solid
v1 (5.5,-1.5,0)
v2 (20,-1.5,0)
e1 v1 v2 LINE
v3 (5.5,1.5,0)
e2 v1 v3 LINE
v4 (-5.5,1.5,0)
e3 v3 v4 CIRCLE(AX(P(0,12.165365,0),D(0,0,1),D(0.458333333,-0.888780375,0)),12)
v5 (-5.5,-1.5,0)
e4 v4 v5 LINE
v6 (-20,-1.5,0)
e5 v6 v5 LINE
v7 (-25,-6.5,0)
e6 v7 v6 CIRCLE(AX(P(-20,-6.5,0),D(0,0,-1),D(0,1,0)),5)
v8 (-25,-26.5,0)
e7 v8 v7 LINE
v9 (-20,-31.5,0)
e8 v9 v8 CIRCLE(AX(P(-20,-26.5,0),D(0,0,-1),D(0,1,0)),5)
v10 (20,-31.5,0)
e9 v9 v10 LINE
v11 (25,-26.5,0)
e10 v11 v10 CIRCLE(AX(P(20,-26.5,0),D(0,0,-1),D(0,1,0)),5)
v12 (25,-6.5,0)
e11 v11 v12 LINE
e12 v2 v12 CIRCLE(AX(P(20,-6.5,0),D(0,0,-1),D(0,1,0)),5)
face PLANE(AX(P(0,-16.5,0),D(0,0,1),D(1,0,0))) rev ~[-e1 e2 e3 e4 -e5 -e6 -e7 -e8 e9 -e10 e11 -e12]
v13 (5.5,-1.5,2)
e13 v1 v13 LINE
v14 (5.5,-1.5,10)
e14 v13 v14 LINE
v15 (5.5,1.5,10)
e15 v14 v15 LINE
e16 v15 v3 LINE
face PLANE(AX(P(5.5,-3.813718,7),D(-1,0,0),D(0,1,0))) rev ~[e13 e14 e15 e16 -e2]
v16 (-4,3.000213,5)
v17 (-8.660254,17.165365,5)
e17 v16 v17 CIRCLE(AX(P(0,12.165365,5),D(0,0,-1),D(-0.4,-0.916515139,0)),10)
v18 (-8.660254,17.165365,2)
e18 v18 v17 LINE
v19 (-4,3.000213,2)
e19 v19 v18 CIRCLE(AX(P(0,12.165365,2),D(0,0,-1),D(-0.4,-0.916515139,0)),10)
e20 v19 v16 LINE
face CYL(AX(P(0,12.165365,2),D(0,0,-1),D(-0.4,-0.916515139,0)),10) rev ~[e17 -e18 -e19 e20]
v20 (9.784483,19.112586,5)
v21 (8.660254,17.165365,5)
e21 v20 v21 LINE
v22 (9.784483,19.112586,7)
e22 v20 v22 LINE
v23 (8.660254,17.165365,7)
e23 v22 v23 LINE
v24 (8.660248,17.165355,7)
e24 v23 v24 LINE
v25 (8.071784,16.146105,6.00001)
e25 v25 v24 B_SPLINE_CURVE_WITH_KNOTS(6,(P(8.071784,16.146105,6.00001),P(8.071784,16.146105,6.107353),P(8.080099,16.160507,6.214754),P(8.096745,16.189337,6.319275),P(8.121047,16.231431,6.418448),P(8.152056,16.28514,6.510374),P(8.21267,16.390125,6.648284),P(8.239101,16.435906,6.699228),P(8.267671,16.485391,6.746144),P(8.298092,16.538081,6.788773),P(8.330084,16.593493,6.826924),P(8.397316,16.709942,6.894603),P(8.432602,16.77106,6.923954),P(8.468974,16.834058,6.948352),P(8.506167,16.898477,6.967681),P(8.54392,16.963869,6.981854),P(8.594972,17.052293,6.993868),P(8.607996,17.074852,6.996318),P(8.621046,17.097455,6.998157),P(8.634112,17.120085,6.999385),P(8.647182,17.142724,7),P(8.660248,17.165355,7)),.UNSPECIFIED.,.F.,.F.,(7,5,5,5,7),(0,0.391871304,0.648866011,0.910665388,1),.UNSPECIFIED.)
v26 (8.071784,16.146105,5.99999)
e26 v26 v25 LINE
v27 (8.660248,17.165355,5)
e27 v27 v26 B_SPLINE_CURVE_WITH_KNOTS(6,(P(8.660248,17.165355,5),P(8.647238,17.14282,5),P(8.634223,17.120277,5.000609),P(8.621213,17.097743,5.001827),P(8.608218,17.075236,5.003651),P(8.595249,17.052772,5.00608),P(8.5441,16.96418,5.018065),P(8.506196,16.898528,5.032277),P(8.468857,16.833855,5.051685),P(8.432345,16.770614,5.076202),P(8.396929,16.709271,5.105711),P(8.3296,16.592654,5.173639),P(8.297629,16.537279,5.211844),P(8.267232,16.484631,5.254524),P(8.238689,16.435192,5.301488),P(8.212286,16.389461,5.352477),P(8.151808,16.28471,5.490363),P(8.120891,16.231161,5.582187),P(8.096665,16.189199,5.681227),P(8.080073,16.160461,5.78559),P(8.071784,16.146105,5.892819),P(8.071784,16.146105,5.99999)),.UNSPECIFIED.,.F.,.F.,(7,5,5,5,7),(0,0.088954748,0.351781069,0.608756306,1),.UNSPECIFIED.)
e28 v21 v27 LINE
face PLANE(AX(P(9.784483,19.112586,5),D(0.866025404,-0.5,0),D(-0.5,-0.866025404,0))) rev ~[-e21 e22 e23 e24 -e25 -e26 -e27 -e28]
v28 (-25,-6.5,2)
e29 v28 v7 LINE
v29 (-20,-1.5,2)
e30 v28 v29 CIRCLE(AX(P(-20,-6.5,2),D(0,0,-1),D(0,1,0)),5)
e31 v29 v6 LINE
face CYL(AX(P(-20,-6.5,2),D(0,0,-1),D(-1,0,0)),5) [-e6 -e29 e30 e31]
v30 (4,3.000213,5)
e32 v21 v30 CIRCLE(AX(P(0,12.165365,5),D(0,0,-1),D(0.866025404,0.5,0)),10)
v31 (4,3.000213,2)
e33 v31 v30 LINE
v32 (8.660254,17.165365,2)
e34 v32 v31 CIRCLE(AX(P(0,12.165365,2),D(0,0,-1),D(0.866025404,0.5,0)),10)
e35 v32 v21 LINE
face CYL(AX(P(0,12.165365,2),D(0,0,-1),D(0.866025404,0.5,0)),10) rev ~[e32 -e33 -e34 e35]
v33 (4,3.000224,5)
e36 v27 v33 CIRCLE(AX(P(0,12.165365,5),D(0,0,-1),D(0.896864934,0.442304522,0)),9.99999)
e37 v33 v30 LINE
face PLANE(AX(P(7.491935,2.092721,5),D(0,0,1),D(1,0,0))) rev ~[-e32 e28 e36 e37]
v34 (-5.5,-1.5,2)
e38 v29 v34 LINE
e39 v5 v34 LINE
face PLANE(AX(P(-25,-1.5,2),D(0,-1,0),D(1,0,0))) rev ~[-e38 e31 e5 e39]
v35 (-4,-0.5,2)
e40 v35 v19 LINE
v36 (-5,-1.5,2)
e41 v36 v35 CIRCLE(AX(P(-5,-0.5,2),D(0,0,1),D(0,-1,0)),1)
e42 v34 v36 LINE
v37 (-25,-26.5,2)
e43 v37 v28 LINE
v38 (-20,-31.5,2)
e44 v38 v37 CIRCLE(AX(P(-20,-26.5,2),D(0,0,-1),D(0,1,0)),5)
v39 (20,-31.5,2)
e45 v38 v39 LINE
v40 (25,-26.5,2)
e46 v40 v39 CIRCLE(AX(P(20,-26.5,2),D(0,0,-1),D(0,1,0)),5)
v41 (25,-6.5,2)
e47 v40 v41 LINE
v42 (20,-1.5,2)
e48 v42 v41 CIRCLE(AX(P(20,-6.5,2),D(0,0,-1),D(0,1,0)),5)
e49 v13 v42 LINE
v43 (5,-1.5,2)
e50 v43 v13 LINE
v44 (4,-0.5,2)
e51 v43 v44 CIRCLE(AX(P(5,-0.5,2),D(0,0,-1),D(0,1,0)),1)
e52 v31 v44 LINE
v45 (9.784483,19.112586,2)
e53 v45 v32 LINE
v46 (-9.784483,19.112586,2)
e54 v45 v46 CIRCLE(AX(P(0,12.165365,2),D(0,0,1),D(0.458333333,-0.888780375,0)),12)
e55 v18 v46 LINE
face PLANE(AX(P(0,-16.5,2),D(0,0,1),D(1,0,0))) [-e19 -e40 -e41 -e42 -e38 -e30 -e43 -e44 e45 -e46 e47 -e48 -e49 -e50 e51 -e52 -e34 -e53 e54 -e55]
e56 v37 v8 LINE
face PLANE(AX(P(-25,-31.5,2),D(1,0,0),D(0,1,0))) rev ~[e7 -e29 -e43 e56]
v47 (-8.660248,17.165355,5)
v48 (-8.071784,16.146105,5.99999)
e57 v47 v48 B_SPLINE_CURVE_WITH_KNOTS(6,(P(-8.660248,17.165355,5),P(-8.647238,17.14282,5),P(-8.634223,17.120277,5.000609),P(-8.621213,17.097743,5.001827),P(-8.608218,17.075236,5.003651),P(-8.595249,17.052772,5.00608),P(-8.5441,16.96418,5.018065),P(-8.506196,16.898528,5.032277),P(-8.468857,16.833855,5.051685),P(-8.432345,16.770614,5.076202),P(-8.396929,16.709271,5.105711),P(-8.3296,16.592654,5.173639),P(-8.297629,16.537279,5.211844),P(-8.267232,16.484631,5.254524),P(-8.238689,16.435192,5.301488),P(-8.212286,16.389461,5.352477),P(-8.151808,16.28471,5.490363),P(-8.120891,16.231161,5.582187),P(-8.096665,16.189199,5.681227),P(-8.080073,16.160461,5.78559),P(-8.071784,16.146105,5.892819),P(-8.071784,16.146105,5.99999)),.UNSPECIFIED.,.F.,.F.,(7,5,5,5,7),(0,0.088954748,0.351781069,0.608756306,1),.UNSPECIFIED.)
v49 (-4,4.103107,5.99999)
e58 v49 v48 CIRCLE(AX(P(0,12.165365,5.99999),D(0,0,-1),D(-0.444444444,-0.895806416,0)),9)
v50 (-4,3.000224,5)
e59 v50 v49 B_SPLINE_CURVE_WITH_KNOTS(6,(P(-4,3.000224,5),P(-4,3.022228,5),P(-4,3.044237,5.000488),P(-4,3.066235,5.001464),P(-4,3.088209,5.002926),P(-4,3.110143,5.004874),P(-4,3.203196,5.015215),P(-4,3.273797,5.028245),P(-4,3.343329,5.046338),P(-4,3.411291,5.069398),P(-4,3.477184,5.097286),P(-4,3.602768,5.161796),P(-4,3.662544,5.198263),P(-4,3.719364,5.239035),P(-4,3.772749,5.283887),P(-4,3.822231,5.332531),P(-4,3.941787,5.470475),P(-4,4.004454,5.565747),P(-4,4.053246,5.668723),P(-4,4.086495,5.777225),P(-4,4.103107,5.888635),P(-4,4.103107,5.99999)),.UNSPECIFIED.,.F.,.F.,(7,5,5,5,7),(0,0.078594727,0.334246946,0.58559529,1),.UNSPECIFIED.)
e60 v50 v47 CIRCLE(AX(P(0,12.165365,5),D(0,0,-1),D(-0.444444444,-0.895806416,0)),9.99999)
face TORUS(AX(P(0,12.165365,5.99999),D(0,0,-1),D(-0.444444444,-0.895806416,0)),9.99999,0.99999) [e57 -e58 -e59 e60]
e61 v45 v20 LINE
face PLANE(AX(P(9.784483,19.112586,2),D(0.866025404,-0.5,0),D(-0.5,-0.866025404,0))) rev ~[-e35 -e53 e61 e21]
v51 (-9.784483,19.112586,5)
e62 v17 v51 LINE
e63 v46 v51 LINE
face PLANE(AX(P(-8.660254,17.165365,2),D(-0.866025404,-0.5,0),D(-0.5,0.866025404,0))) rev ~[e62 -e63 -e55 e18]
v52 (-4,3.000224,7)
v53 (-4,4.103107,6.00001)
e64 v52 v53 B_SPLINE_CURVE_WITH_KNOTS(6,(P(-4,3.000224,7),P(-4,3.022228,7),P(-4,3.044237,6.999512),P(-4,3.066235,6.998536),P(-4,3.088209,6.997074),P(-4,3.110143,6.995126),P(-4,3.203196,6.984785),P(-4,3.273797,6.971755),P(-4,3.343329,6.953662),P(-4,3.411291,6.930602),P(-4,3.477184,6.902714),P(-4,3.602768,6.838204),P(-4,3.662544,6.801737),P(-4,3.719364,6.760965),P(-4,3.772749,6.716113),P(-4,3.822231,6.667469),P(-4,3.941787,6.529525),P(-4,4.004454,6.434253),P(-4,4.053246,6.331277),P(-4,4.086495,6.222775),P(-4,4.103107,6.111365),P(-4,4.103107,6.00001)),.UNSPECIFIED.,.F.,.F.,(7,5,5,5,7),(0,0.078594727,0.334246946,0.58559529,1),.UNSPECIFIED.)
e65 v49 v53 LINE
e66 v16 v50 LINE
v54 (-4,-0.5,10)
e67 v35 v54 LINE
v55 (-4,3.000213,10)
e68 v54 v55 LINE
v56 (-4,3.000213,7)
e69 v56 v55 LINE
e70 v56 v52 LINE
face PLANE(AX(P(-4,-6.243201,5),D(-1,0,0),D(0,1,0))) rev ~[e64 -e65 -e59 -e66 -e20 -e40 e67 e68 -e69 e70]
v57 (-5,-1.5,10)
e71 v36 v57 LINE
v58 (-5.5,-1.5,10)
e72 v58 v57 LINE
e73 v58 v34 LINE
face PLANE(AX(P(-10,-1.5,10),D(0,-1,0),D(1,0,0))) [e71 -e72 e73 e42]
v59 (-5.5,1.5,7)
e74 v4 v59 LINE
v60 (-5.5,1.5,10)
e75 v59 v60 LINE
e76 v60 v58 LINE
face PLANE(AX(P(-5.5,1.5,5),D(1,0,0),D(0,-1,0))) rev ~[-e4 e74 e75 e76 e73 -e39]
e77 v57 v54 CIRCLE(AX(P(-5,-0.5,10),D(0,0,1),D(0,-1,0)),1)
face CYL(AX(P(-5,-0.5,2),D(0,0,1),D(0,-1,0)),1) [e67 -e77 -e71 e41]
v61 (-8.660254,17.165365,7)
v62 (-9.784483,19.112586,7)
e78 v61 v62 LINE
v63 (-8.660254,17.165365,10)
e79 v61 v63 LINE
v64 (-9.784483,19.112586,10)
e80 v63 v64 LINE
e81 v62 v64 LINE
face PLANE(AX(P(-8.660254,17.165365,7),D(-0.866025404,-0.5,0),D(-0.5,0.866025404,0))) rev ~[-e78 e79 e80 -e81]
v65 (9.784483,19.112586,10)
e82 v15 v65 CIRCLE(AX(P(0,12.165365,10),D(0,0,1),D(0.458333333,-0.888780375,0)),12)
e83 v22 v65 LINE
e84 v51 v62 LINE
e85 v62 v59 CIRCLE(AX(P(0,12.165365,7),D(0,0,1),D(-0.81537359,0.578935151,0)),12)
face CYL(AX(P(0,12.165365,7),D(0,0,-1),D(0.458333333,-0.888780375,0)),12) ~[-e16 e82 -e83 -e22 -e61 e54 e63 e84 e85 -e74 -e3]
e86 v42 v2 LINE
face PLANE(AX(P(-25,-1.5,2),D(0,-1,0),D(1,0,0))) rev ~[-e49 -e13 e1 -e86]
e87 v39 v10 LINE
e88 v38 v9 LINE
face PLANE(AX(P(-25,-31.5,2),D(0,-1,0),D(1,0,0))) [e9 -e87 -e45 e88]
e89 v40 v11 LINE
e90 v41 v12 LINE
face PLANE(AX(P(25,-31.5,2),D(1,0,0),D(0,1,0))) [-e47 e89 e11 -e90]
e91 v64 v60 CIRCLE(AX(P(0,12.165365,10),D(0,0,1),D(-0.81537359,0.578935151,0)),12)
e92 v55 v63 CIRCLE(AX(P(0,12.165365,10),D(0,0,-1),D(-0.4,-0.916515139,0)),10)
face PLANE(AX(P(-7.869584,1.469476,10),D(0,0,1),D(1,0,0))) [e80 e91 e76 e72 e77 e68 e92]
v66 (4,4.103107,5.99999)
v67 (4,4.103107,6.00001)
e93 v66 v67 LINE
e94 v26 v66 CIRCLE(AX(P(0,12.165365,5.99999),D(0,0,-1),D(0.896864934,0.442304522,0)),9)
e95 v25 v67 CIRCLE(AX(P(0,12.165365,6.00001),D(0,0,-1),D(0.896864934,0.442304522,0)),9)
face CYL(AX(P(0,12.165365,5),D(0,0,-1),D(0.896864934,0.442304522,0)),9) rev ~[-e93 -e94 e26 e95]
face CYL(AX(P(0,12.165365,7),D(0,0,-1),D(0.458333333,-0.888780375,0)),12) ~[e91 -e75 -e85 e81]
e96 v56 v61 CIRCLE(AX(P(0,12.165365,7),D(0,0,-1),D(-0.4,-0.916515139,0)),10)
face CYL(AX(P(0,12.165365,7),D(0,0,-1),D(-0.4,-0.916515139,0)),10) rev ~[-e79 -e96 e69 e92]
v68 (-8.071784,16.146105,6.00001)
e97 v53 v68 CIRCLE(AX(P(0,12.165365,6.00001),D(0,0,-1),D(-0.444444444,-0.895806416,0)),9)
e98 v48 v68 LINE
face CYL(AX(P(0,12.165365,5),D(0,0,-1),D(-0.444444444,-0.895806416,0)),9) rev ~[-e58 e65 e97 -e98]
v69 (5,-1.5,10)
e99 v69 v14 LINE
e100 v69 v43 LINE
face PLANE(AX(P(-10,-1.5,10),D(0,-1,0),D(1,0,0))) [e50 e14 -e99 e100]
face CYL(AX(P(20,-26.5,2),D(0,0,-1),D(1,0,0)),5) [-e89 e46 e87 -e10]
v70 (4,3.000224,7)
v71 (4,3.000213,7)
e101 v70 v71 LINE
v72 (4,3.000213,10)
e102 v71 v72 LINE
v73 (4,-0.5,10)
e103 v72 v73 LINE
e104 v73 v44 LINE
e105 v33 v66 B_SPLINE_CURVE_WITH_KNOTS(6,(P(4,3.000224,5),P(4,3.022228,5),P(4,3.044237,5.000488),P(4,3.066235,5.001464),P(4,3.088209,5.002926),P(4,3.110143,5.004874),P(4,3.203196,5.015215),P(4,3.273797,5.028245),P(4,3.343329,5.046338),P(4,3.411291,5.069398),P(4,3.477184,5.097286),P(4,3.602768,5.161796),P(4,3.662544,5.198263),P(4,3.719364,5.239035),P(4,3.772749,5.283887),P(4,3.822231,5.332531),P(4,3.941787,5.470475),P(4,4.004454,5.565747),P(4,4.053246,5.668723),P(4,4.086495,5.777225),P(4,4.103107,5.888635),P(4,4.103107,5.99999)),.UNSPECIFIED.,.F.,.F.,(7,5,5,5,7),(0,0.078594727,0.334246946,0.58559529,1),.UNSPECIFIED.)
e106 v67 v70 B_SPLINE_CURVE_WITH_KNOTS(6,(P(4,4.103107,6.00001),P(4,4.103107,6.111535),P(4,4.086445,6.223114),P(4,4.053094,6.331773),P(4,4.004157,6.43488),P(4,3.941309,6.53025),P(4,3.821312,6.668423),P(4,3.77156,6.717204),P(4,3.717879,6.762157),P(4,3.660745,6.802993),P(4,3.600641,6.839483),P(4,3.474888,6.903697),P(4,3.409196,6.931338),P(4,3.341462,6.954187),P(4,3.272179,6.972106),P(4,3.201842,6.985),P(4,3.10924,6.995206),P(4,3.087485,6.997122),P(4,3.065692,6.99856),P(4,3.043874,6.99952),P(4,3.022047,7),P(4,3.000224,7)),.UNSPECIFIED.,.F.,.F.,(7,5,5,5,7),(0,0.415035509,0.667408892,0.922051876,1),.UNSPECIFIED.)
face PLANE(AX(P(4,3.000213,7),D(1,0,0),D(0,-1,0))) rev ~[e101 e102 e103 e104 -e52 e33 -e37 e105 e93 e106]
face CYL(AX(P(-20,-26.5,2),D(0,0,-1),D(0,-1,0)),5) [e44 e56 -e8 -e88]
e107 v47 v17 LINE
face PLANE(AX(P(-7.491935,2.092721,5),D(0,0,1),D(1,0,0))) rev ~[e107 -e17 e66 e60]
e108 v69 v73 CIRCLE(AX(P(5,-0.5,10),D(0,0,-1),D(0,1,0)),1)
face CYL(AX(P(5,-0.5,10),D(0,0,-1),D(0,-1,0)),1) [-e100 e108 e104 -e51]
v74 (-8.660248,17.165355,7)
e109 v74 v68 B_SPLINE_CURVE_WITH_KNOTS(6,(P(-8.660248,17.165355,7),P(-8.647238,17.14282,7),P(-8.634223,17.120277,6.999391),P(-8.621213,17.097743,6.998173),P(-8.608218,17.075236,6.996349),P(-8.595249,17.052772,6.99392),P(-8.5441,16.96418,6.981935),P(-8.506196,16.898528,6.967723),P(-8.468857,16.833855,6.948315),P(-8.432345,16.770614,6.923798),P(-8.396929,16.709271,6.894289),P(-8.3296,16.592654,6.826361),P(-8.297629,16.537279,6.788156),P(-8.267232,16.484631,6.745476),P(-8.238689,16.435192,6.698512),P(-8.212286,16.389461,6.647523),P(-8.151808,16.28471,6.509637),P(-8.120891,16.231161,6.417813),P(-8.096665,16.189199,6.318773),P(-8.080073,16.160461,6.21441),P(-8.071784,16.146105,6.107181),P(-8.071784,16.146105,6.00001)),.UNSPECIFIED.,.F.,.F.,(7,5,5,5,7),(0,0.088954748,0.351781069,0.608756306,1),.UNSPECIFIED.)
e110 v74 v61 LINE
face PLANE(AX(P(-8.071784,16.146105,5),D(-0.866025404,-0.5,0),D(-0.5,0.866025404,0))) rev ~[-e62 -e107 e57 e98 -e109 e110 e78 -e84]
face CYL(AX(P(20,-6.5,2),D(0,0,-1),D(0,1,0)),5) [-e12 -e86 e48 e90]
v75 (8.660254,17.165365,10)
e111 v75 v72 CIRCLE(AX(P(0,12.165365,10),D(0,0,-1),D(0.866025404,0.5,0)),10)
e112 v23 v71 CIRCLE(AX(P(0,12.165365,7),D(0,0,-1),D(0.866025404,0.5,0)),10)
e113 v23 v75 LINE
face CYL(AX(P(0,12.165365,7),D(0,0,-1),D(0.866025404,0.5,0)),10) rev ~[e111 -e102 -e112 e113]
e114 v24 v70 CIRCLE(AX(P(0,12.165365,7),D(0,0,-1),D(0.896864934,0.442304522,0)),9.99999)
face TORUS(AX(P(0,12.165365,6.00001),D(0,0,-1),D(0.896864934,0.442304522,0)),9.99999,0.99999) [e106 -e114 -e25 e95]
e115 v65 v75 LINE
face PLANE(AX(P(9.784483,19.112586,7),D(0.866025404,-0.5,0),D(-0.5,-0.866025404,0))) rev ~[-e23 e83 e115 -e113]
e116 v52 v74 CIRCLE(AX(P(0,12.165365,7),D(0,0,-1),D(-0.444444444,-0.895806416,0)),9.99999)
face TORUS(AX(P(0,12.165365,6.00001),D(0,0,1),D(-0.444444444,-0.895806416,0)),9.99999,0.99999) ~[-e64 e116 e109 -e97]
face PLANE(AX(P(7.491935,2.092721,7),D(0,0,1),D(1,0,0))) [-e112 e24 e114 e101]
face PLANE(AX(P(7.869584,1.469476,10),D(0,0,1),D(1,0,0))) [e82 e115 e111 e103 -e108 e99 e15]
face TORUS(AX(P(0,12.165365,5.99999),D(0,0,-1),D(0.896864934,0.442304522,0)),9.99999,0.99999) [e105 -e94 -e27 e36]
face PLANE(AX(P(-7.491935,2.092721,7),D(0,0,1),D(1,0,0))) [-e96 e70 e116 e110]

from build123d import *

# Parameters (mm, degrees)
F1_DEPTH  = 2
F3_DEPTH  = 3
F5_DEPTH  = 2
F7_DEPTH  = 3
F8_R      = 0.99999
F9_W      = 20
F9_H      = 14.6653645039
F10_DEPTH = 8
F11_W     = 50
F11_H     = 30
F12_DEPTH = 2
F13_R     = 1
F14_R     = 5


# Not quite as in the source:
# - a fillet or chamfer is up to 0.001 mm smaller than in the source, because OpenCascade refuses the exact size


with BuildPart() as f1:
    # F0 (on Top) → F1 (new body)
    with BuildSketch(Plane.XY):
        with BuildLine():
            ThreePointArc((5.5, 1.5), (0, 24.1653645039), (-5.5, 1.5))
            Line((-5.5, 1.5), (-5.5, -1.5))
            ThreePointArc((-5.5, -1.5), (0, -24.1653645039), (5.5, -1.5))
            Line((5.5, -1.5), (5.5, 1.5))
        make_face()
    extrude(amount=F1_DEPTH)

    # F2 (on face) → F3 (join)
    with BuildSketch(Plane.XY.offset(2)):
        with BuildLine():
            Line((9.7844830762, 19.1125863177), (8.6602540378, 17.1653645039))
            ThreePointArc((8.6602540378, 17.1653645039), (9.4991255677, 9.0402063559), (4, 3.0002131139))
            Line((4, 3.0002131139), (4, -6.2432010007))
            Line((4, -6.2432010007), (9.1651513899, -16.1653645039))
            ThreePointArc((9.1651513899, -16.1653645039), (9.5868378212, -9.3206253964), (5.5, -3.8137179596))
            Line((5.5, -3.8137179596), (5.5, 1.5))
            ThreePointArc((5.5, 1.5), (11.6599594736, 9.3289327537), (9.7844830762, 19.1125863177))
        make_face()
        with BuildLine():
            ThreePointArc((-4, 3.0002131139), (-9.4991255677, 9.0402063559), (-8.6602540378, 17.1653645039))
            Line((-8.6602540378, 17.1653645039), (-9.7844830762, 19.1125863177))
            ThreePointArc((-9.7844830762, 19.1125863177), (-11.6599594736, 9.3289327537), (-5.5, 1.5))
            Line((-5.5, 1.5), (-5.5, -3.8137179596))
            ThreePointArc((-5.5, -3.8137179596), (-9.5868378212, -9.3206253964), (-9.1651513899, -16.1653645039))
            Line((-9.1651513899, -16.1653645039), (-4, -6.2432010007))
            Line((-4, -6.2432010007), (-4, 3.0002131139))
        make_face()
    extrude(amount=F3_DEPTH)

    # F4 (on face) → F5 (join)
    with BuildSketch(Plane.XY.offset(5)):
        with BuildLine():
            Line((-8.0717844057, 16.1461052023), (-9.7844830762, 19.1125863177))
            ThreePointArc((-9.7844830762, 19.1125863177), (-11.6599594736, 9.3289327537), (-5.5, 1.5))
            Line((-5.5, 1.5), (-5.5, -5.0414610795))
            ThreePointArc((-5.5, -5.0414610795), (-8.6043935433, -9.5263473097), (-8.5483759414, -14.980549891))
            Line((-8.5483759414, -14.980549891), (-4, -6.2432010007))
            Line((-4, -6.2432010007), (-4, 4.1031067556))
            ThreePointArc((-4, 4.1031067556), (-8.5258693153, 9.2827350759), (-8.0717844057, 16.1461052023))
        make_face()
        with BuildLine():
            ThreePointArc((5.5, 1.5), (11.6599594736, 9.3289327537), (9.7844830762, 19.1125863177))
            Line((9.7844830762, 19.1125863177), (8.0717844057, 16.1461052023))
            ThreePointArc((8.0717844057, 16.1461052023), (8.5258693153, 9.2827350759), (4, 4.1031067556))
            Line((4, 4.1031067556), (4, -6.2432010007))
            Line((4, -6.2432010007), (8.5483759414, -14.980549891))
            ThreePointArc((8.5483759414, -14.980549891), (8.6043935433, -9.5263473097), (5.5, -5.0414610795))
            Line((5.5, -5.0414610795), (5.5, 1.5))
        make_face()
    extrude(amount=F5_DEPTH)

    # F6 (on face) → F7 (join)
    with BuildSketch(Plane.XY.offset(7)):
        with BuildLine():
            Line((9.7844830762, 19.1125863177), (8.6602540378, 17.1653645039))
            ThreePointArc((8.6602540378, 17.1653645039), (9.4991255677, 9.0402063559), (4, 3.0002131139))
            Line((4, 3.0002131139), (4, -6.2432010007))
            Line((4, -6.2432010007), (9.1651513899, -16.1653645039))
            ThreePointArc((9.1651513899, -16.1653645039), (9.5868378212, -9.3206253964), (5.5, -3.8137179596))
            Line((5.5, -3.8137179596), (5.5, 1.5))
            ThreePointArc((5.5, 1.5), (11.6599594736, 9.3289327537), (9.7844830762, 19.1125863177))
        make_face()
        with BuildLine():
            ThreePointArc((-4, 3.0002131139), (-9.4991255677, 9.0402063559), (-8.6602540378, 17.1653645039))
            Line((-8.6602540378, 17.1653645039), (-9.7844830762, 19.1125863177))
            ThreePointArc((-9.7844830762, 19.1125863177), (-11.6599594736, 9.3289327537), (-5.5, 1.5))
            Line((-5.5, 1.5), (-5.5, -3.8137179596))
            ThreePointArc((-5.5, -3.8137179596), (-9.5868378212, -9.3206253964), (-9.1651513899, -16.1653645039))
            Line((-9.1651513899, -16.1653645039), (-4, -6.2432010007))
            Line((-4, -6.2432010007), (-4, 3.0002131139))
        make_face()
    extrude(amount=F7_DEPTH)

    # F8 (radius 1 in the source; OpenCascade refuses exactly that, so slightly less here)
    f8_edges = [f1.edges().sort_by_distance(p)[0] for p in [
        (8.525869, 9.282735, 7),
        (-8.525869, 9.282735, 7),
        (-8.525869, 9.282735, 5),
        (8.525869, 9.282735, 5),
        (-8.604394, -9.526347, 5),
        (-8.604394, -9.526347, 7),
        (8.604394, -9.526347, 7),
        (8.604394, -9.526347, 5),
    ]]
    fillet(f8_edges, radius=F8_R)

    # F9 (on face) → F10 (cut)
    with BuildSketch(Plane.XY.offset(10)):
        with Locations((0, -8.8326822519)):
            Rectangle(F9_W, F9_H)
    extrude(amount=-F10_DEPTH, mode=Mode.SUBTRACT)

    # F11 (on face) → F12 (join)
    with BuildSketch(Plane.XY.offset(2)):
        with Locations((0, -16.5)):
            Rectangle(F11_W, F11_H)
    extrude(amount=-F12_DEPTH)

    # F13
    f13_edges = [f1.edges().sort_by_distance(p)[0] for p in [
        (-4, -1.5, 6),
        (4, -1.5, 6),
    ]]
    fillet(f13_edges, radius=F13_R)

    # F14
    f14_edges = [f1.edges().sort_by_distance(p)[0] for p in [
        (-25, -1.5, 1),
        (-25, -31.5, 1),
        (25, -31.5, 1),
        (25, -1.5, 1),
    ]]
    fillet(f14_edges, radius=F14_R)


solid = f1.part
